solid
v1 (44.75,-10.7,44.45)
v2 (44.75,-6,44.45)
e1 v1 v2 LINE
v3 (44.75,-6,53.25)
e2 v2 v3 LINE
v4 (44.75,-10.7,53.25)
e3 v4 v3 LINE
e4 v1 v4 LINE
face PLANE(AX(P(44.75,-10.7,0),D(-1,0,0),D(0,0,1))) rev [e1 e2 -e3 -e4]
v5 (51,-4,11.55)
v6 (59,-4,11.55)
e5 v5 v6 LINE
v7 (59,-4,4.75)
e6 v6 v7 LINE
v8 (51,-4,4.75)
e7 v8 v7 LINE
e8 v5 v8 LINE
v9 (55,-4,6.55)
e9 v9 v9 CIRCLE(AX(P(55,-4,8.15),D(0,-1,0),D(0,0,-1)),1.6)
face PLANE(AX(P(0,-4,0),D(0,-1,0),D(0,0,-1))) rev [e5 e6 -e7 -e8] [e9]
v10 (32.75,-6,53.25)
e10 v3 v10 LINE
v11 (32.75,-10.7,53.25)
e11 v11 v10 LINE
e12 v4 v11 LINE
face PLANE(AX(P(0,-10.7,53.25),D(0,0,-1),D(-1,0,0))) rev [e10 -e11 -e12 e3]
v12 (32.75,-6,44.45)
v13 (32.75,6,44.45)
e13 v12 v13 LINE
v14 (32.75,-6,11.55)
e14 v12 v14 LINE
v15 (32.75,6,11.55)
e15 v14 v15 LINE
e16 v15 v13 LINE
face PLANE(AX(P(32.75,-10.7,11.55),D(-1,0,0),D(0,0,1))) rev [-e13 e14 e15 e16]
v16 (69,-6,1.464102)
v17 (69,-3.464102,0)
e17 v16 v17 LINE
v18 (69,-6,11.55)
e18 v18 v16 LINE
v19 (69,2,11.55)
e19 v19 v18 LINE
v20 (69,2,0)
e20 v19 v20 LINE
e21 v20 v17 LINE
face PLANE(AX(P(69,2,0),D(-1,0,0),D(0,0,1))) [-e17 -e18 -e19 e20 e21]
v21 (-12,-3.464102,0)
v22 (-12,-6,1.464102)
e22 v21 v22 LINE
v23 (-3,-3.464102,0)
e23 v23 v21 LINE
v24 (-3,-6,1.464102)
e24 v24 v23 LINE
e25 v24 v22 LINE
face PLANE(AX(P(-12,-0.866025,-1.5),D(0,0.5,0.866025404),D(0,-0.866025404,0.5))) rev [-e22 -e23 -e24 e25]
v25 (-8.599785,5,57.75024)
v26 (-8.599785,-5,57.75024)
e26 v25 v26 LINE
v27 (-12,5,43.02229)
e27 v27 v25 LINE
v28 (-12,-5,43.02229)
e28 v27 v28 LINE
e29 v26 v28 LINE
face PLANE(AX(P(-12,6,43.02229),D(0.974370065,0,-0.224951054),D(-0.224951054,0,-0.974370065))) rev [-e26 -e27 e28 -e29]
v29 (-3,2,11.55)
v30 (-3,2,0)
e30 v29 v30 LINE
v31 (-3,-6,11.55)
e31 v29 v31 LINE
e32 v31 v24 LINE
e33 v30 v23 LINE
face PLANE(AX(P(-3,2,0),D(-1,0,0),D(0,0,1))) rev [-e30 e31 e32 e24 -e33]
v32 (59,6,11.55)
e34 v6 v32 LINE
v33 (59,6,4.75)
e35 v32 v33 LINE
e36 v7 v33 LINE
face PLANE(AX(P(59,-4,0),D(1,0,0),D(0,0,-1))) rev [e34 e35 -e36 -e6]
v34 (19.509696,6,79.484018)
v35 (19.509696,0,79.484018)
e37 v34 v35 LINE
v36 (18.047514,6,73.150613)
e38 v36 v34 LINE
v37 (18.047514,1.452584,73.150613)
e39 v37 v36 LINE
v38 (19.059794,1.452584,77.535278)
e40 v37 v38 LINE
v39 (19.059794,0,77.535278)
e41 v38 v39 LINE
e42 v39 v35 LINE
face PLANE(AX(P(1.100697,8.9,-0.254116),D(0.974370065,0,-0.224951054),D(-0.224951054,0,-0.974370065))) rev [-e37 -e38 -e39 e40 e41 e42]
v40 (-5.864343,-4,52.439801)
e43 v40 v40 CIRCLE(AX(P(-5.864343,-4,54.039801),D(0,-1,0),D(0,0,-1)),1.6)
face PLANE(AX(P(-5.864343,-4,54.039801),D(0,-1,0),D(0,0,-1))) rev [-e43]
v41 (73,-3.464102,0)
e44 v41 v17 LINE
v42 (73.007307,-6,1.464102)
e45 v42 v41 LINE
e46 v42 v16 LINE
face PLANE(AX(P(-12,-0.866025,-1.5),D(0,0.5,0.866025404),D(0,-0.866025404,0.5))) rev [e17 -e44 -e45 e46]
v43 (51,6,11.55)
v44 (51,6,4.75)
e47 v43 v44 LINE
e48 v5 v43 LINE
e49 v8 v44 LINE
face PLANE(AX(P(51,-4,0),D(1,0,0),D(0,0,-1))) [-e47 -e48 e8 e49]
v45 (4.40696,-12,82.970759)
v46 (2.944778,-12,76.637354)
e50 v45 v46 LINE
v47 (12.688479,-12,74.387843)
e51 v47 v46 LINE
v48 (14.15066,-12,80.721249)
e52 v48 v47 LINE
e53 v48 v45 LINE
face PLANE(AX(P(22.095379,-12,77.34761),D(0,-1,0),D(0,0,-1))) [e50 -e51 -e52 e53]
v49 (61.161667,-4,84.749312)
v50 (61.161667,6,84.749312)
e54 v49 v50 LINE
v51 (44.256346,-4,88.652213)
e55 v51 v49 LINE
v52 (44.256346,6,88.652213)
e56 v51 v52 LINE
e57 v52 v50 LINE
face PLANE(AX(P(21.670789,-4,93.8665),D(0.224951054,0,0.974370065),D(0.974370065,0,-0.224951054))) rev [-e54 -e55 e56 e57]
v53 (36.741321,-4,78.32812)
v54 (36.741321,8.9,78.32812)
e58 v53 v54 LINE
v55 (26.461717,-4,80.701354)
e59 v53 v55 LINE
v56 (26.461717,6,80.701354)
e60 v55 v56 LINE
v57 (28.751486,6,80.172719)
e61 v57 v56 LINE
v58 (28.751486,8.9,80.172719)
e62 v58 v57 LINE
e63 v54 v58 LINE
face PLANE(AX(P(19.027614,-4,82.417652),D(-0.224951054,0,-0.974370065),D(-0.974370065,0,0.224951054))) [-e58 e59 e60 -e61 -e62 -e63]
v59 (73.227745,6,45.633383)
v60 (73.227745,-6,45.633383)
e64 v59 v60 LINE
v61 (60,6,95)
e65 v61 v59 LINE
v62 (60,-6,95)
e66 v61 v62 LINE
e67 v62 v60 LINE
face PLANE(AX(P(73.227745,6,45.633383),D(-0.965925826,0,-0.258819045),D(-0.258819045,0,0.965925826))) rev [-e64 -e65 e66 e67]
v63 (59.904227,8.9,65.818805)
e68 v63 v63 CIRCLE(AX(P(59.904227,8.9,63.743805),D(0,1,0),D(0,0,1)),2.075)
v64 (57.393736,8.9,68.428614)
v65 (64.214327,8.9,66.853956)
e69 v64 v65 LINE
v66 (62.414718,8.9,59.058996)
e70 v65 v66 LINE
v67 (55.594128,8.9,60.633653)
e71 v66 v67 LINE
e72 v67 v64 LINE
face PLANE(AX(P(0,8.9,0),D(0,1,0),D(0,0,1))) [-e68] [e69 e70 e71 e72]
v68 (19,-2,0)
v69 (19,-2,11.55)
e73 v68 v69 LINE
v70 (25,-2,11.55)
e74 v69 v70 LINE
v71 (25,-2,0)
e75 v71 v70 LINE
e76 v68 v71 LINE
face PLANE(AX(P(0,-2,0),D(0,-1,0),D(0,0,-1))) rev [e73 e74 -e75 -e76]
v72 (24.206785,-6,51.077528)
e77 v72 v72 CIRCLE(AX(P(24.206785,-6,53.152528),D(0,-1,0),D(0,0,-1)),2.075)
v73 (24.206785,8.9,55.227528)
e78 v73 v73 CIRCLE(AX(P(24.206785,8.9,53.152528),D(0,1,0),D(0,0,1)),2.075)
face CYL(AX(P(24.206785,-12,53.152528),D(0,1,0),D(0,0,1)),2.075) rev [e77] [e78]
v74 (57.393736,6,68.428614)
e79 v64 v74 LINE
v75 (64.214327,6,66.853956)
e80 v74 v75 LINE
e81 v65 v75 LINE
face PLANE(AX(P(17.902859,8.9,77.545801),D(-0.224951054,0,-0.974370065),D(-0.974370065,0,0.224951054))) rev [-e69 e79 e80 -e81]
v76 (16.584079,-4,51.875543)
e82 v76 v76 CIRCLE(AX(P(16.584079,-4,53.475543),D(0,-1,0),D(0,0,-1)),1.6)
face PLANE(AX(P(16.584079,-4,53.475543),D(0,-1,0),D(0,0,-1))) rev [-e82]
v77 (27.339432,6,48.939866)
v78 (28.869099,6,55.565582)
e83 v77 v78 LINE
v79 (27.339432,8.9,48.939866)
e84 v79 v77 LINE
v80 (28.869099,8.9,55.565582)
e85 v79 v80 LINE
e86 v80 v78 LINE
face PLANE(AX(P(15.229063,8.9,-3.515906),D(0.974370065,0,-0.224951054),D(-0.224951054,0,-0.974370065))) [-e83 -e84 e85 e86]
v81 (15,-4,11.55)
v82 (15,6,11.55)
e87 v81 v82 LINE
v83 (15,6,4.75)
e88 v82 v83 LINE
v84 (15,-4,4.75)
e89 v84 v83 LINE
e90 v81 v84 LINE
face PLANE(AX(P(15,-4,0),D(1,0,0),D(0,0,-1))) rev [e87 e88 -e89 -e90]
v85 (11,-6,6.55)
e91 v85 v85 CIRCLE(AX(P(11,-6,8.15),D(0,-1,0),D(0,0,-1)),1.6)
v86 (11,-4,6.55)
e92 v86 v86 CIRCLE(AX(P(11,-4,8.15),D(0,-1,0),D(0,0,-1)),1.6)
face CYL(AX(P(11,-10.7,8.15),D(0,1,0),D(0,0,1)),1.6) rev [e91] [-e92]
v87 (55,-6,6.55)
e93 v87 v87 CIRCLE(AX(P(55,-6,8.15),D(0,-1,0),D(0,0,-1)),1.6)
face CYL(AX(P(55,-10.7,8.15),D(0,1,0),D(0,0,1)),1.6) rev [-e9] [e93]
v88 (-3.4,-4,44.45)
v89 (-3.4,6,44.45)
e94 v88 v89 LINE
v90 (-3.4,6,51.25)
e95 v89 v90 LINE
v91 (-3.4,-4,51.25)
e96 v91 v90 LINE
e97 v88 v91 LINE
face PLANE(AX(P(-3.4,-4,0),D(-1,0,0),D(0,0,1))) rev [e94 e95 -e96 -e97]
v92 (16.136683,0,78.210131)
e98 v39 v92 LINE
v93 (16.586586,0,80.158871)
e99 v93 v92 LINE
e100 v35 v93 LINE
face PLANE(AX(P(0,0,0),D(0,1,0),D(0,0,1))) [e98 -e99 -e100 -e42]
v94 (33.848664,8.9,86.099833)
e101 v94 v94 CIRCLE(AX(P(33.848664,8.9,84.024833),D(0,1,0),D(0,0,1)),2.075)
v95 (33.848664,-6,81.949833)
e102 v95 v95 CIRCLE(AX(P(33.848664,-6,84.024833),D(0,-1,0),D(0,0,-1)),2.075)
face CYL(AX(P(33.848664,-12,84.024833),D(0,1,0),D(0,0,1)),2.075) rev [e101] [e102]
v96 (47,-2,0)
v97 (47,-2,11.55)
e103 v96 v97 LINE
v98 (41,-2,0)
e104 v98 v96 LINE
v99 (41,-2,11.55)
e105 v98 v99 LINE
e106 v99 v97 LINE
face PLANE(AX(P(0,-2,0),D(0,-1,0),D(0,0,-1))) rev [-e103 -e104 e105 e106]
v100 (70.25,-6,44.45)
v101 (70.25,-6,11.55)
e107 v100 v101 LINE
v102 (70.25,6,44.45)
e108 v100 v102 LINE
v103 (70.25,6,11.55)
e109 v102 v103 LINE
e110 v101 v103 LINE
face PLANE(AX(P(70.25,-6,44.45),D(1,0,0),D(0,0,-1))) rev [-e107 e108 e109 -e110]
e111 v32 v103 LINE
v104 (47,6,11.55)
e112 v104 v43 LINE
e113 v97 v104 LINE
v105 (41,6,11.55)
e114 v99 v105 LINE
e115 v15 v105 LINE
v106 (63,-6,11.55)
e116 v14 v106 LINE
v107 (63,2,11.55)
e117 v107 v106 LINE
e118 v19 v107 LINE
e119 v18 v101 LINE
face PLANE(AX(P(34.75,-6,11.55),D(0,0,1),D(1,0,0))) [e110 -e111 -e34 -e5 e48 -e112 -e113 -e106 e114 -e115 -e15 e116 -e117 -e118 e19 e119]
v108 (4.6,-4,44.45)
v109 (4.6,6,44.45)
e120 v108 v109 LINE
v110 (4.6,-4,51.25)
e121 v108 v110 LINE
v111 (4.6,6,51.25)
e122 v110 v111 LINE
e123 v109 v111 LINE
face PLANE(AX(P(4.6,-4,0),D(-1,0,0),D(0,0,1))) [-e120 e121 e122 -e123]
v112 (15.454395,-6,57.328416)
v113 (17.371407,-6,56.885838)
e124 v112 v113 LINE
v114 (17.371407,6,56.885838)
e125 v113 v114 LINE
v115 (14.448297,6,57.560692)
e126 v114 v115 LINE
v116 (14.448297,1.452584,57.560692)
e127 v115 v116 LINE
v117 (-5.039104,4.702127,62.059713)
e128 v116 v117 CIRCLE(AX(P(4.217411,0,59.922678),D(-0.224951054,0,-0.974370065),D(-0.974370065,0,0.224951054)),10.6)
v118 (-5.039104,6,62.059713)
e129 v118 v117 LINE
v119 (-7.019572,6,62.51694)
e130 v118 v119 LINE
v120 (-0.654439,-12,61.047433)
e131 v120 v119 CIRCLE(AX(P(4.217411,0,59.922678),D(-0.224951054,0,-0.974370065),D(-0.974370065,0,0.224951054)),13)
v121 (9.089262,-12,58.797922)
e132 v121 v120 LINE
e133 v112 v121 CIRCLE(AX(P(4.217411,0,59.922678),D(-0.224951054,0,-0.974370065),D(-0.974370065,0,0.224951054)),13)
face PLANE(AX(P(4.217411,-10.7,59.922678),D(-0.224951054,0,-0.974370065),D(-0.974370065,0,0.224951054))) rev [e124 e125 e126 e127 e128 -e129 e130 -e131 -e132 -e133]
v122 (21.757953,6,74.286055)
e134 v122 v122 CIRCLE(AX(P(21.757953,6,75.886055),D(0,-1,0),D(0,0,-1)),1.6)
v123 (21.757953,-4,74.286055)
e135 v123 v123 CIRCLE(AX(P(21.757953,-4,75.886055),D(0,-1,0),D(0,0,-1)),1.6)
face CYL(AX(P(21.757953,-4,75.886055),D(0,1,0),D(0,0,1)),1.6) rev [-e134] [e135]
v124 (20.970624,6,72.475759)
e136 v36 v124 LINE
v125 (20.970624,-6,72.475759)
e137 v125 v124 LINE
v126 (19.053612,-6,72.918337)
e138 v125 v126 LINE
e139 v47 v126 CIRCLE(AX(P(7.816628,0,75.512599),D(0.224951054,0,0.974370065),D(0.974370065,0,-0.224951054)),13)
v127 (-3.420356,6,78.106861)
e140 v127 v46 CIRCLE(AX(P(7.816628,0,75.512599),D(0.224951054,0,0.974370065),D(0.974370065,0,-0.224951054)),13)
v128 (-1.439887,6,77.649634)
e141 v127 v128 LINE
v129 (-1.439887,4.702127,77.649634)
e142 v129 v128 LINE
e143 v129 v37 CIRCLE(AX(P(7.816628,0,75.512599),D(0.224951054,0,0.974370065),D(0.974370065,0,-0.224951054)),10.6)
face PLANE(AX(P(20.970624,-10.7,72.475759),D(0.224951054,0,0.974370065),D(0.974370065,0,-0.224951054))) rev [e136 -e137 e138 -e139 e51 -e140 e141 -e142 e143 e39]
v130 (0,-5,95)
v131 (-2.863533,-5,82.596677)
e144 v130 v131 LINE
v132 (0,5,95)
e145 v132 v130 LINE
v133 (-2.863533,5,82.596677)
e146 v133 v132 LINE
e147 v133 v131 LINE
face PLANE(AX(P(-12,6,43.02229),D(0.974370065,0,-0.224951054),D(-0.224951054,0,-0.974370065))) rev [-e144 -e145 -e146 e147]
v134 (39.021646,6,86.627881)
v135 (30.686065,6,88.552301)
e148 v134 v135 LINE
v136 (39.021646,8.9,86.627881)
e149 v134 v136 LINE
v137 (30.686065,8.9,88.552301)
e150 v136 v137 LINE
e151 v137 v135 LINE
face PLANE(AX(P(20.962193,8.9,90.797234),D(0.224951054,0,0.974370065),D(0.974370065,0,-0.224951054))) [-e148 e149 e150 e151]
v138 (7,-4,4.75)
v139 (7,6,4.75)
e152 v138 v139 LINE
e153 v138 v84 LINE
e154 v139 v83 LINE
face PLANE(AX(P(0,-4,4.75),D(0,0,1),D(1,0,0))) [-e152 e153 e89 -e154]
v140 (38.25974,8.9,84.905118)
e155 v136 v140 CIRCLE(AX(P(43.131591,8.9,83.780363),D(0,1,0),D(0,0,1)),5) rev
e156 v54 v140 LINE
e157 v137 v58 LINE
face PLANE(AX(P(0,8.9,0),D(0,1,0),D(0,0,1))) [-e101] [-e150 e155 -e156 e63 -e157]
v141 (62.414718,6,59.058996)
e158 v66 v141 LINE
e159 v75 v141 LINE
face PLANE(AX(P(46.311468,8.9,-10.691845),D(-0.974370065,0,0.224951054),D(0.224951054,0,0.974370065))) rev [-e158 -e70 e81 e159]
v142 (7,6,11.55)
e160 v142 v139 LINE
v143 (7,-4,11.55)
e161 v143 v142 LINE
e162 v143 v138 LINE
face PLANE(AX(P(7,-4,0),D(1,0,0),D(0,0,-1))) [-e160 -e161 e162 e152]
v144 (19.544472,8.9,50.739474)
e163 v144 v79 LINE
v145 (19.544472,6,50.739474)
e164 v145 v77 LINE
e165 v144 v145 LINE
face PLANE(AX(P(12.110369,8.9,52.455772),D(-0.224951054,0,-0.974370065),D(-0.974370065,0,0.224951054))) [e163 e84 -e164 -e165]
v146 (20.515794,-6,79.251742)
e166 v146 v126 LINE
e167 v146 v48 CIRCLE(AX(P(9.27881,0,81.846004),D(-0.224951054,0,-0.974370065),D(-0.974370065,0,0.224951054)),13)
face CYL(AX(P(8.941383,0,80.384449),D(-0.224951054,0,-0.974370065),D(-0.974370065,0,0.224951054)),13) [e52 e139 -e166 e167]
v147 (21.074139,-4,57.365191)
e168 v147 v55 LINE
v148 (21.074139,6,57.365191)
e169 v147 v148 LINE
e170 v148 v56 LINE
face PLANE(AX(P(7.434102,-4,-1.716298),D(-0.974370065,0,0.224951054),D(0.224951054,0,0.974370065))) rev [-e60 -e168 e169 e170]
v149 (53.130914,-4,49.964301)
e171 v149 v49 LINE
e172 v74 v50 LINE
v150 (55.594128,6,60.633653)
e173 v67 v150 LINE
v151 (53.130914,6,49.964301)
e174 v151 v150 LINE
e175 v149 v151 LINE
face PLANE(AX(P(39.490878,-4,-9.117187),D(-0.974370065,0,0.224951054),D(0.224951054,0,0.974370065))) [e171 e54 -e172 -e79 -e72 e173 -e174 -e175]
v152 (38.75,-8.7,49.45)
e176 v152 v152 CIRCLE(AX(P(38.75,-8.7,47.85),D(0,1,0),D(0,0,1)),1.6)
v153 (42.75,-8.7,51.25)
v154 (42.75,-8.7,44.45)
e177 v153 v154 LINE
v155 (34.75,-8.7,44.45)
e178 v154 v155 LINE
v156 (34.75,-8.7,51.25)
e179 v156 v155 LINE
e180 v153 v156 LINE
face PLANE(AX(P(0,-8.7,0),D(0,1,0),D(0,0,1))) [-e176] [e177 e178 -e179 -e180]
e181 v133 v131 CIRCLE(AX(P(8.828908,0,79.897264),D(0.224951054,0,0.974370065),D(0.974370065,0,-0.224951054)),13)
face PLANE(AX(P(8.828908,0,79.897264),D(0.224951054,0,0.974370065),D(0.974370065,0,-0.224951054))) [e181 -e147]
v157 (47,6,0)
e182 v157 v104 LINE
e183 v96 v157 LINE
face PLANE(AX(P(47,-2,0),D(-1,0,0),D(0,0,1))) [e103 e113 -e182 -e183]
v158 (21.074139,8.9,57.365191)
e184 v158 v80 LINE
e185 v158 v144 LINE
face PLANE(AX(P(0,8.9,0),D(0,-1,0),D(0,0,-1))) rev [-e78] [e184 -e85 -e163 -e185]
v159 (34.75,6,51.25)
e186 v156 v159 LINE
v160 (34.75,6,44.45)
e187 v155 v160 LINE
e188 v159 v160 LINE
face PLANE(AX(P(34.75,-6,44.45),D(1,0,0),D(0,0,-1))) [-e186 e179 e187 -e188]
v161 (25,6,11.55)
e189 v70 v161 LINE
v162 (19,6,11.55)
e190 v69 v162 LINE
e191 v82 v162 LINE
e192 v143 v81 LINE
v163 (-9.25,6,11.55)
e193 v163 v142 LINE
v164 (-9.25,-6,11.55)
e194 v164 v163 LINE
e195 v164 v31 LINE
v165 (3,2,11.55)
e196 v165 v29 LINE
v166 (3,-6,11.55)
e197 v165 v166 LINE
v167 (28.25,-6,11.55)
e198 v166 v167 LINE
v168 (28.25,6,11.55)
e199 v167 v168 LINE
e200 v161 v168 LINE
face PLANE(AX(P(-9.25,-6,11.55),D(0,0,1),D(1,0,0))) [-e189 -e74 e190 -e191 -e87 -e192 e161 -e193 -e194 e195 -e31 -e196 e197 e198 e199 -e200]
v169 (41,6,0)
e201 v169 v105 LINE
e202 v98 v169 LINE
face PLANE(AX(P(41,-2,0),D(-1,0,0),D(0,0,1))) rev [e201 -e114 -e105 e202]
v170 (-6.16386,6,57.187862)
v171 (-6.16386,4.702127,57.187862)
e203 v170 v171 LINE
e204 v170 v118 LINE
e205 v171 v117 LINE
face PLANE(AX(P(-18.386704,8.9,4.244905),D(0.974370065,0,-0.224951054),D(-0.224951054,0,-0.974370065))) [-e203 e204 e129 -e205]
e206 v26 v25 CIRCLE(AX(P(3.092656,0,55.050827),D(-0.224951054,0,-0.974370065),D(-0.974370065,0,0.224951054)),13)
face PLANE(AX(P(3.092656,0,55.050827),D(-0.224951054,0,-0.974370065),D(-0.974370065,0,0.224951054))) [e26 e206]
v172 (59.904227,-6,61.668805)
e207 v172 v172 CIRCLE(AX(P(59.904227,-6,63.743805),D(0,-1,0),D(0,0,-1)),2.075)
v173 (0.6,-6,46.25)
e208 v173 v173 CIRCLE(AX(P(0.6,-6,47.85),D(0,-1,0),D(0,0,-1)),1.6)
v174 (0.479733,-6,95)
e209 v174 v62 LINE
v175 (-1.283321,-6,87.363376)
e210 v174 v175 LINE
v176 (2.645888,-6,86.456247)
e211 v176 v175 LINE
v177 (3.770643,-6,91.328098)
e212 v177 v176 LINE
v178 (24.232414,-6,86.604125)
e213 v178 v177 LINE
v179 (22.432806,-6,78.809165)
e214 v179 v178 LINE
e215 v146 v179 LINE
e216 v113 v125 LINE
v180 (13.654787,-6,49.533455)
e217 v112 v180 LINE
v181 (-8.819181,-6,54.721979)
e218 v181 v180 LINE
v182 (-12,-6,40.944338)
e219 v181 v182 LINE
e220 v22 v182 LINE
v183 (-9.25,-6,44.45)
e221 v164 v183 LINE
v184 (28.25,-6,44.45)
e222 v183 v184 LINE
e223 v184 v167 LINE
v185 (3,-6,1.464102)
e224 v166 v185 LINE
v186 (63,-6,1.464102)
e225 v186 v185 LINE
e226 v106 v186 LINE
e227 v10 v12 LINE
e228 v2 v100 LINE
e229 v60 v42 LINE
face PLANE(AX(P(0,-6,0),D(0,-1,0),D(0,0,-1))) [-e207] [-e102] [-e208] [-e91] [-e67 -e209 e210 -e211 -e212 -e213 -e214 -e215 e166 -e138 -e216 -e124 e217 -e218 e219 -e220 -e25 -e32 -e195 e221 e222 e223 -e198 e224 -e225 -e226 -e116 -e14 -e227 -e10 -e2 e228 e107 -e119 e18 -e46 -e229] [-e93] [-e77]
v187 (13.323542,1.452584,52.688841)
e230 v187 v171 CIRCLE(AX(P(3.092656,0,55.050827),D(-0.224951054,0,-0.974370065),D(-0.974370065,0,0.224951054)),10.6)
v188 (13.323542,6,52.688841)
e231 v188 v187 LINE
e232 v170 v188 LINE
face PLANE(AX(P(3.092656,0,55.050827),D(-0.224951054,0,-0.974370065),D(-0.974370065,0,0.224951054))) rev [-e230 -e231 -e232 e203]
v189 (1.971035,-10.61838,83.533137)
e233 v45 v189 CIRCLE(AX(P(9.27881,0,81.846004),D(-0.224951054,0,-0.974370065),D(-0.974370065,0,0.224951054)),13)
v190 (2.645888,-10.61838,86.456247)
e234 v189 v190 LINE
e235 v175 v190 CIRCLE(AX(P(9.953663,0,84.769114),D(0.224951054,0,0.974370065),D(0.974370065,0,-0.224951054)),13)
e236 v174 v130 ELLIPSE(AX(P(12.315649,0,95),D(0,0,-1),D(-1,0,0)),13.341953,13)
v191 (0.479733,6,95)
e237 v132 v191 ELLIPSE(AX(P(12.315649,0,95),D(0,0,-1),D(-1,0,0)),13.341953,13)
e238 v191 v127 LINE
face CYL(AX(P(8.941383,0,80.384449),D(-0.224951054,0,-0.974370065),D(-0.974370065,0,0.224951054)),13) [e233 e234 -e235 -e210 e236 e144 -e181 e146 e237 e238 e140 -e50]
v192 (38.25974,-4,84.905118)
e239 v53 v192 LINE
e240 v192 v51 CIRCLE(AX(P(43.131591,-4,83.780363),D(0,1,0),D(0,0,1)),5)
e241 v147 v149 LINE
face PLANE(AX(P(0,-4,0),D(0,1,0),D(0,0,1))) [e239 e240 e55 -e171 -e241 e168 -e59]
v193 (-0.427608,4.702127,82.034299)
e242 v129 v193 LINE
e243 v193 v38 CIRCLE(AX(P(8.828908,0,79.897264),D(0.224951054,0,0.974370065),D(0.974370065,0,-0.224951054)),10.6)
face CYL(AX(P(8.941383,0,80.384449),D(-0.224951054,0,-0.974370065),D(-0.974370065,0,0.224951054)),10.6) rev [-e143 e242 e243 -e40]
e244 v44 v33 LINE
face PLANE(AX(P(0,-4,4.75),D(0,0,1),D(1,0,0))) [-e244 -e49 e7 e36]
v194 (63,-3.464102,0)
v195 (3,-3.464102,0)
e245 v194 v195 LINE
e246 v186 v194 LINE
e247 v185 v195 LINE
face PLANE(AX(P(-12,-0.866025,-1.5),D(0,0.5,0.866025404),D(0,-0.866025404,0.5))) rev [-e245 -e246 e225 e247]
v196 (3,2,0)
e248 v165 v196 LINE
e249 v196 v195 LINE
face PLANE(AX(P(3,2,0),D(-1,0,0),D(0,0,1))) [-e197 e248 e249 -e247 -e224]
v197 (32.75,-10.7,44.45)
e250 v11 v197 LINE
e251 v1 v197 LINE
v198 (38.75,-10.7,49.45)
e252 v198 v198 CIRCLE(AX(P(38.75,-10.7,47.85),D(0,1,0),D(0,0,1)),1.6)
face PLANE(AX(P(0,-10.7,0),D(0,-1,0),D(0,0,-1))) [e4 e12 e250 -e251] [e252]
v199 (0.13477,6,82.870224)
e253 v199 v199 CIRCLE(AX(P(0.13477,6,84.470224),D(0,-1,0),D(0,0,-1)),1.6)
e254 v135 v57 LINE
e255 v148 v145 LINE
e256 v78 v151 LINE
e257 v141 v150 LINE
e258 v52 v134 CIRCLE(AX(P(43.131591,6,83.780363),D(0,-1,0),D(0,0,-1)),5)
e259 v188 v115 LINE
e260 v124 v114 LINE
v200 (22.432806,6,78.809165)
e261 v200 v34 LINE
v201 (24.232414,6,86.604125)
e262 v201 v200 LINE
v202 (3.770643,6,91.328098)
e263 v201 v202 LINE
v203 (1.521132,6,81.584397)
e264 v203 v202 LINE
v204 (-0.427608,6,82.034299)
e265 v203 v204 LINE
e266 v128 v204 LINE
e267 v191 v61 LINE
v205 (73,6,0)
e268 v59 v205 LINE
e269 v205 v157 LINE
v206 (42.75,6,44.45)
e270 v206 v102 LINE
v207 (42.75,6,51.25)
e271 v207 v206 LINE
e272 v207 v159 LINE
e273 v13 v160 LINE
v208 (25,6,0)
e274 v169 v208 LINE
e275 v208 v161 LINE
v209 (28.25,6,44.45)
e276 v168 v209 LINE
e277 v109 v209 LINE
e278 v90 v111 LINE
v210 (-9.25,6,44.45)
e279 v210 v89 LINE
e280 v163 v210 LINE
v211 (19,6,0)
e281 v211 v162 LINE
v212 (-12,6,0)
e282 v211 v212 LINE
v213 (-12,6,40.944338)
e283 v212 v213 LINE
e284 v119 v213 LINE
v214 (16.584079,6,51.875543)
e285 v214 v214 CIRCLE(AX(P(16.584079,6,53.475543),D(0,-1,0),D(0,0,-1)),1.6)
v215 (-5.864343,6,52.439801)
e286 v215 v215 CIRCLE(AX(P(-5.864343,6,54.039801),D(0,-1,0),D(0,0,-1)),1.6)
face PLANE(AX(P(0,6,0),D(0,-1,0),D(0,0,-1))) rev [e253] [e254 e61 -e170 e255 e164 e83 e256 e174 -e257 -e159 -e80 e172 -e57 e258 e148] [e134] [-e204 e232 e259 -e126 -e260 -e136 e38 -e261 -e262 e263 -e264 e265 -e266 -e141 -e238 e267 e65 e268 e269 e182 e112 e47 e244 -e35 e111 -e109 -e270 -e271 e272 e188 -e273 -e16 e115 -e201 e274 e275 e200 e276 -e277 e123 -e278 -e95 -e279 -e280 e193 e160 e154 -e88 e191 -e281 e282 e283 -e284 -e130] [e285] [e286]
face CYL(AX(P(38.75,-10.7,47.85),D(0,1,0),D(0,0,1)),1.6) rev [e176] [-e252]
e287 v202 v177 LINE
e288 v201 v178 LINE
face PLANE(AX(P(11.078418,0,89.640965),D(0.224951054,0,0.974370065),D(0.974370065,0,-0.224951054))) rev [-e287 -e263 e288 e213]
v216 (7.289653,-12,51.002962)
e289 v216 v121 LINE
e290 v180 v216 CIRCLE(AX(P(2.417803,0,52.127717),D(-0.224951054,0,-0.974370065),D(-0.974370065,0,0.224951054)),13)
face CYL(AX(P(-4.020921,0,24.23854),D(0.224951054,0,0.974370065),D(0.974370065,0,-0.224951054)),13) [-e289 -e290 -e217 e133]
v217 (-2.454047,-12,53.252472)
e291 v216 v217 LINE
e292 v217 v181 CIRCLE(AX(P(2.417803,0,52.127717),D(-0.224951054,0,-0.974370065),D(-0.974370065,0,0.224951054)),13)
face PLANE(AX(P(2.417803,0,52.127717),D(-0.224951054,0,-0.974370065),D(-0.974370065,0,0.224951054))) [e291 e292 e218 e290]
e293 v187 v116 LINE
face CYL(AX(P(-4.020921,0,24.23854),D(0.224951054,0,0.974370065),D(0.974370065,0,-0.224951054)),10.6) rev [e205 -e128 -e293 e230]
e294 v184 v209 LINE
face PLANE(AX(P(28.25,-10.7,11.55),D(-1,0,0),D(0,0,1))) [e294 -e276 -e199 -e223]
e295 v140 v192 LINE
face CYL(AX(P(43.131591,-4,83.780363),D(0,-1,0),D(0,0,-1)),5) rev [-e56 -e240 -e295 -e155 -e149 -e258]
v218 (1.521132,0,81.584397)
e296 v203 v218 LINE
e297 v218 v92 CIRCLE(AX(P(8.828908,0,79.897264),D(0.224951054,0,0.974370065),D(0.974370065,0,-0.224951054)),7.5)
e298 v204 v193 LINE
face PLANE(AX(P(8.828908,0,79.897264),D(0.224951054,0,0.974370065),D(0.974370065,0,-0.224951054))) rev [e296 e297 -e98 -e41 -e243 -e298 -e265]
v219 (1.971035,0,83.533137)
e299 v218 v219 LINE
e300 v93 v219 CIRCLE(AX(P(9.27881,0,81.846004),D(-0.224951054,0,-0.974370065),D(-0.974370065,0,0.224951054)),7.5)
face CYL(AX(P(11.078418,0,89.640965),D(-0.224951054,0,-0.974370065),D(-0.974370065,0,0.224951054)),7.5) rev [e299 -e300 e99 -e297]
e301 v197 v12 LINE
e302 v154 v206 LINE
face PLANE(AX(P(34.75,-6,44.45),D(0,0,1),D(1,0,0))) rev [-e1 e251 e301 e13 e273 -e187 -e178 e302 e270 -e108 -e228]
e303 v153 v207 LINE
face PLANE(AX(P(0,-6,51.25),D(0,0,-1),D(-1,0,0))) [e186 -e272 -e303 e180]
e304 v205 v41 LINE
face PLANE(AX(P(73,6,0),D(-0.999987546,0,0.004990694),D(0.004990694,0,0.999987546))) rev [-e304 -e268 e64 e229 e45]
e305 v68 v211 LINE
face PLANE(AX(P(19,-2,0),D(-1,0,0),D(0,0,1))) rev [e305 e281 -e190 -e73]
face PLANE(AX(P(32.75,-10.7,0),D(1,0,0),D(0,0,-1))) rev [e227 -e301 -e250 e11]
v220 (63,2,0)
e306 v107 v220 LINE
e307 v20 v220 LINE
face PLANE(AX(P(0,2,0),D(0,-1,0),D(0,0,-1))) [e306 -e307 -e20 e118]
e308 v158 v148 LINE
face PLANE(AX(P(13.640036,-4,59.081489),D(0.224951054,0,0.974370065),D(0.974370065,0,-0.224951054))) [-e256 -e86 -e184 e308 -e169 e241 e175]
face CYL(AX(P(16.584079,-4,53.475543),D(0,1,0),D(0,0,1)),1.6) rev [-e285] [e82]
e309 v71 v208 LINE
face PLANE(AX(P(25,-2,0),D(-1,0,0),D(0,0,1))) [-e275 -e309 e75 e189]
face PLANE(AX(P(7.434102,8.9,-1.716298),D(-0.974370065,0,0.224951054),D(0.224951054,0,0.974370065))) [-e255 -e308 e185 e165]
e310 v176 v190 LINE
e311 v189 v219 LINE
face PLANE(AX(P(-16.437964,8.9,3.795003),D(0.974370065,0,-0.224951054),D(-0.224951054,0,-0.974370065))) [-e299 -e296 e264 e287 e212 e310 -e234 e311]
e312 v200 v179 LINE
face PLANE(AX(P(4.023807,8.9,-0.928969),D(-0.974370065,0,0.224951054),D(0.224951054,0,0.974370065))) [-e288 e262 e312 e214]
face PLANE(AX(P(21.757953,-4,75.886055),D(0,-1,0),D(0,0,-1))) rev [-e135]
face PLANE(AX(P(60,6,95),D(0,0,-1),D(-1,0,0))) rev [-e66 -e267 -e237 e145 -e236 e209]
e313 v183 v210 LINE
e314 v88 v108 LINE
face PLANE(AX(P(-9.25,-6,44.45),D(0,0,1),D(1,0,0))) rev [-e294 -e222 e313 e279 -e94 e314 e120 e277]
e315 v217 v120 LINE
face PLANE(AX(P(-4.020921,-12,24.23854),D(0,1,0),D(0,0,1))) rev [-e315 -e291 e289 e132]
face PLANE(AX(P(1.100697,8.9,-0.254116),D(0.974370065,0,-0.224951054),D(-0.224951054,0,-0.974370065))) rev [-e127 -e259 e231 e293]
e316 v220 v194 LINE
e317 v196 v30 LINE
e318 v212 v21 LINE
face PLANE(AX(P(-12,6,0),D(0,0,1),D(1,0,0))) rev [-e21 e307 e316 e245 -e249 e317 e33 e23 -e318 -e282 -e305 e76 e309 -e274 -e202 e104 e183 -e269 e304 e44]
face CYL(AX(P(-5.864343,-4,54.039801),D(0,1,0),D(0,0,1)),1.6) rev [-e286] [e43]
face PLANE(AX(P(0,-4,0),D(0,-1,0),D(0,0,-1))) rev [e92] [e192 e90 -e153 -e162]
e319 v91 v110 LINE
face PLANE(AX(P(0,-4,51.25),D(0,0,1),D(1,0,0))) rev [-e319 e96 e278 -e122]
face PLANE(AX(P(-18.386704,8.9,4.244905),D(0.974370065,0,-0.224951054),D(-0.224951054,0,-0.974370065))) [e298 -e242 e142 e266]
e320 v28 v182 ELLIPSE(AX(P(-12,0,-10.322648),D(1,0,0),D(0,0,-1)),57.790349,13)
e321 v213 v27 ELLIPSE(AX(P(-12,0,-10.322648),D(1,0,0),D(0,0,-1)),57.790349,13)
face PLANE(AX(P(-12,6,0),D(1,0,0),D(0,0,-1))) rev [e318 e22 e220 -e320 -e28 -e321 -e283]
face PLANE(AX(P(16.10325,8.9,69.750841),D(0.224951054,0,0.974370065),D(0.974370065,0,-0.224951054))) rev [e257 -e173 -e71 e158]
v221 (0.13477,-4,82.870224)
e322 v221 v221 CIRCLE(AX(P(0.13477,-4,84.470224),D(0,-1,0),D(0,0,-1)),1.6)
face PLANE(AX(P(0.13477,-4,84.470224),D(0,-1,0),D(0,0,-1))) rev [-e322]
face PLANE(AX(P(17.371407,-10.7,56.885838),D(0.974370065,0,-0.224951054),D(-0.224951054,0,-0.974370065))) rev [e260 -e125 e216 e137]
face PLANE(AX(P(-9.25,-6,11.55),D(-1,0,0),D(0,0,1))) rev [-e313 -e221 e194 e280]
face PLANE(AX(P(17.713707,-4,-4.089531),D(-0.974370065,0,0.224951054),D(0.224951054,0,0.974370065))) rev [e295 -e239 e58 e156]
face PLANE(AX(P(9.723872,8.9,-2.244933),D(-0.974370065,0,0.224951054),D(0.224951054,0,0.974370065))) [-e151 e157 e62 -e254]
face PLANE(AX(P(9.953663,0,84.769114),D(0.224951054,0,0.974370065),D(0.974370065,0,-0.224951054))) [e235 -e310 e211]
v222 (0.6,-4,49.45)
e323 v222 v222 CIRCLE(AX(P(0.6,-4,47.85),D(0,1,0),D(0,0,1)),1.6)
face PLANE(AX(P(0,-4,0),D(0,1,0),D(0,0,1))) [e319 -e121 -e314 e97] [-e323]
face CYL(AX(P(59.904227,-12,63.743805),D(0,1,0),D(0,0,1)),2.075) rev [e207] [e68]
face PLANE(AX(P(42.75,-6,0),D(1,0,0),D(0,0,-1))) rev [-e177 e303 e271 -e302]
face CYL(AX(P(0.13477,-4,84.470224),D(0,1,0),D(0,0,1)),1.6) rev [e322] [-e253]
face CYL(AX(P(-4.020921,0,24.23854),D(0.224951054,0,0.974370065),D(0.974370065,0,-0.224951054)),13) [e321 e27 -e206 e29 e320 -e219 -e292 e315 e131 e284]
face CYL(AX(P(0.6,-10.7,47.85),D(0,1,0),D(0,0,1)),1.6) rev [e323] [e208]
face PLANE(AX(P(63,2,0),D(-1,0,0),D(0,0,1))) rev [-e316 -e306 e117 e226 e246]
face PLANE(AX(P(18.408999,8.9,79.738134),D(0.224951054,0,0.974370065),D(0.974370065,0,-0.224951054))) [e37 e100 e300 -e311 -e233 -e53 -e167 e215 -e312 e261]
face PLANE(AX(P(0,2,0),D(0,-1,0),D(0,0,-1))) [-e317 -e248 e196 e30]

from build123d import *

# Parameters (mm, degrees)
BOSS_EXTRUDE2_DEPTH      = 6
BOSS_EXTRUDE2_DEPTH_BACK = 6
CUT_EXTRUDE1_DEPTH       = 121.097055122
CUT_EXTRUDE1_DEPTH_BACK  = 121.097055122
SKETCH2_W                = 35.5
SKETCH2_H                = 32.9
CUT_EXTRUDE2_START       = 6
SKETCH2_9_W              = 8
SKETCH2_9_H              = 6.8
SKETCH2_9_R              = 1.6
CUT_EXTRUDE2_DEPTH       = 10
CUT_EXTRUDE15_DEPTH      = 121.097055122
CUT_EXTRUDE15_DEPTH_BACK = 117.097055122
CUT_EXTRUDE15_START      = -4
SKETCH2_11_W             = 8
SKETCH2_11_H             = 6.8
SKETCH2_11_R             = 1.6
EXTRUDE_THIN1_START      = -6
EXTRUDE_THIN1_DEPTH      = 4.7
BOSS_EXTRUDE7_START      = -10.7
SKETCH2_15_W             = 8
SKETCH2_15_H             = 6.8
BOSS_EXTRUDE7_DEPTH      = 2
CUT_EXTRUDE3_DEPTH       = 121.423389128
CUT_EXTRUDE3_DEPTH_BACK  = 121.423389128
SKETCH2_10_R             = 1.6
CUT_EXTRUDE4_DEPTH       = 121.423389128
CUT_EXTRUDE4_DEPTH_BACK  = 121.423389128
SKETCH4_W                = 37.5
SKETCH4_H                = 32.9
CUT_EXTRUDE5_START       = -6
SKETCH5_W                = 6
SKETCH5_H                = 11.55
CUT_EXTRUDE5_DEPTH       = 8
CUT_EXTRUDE6_START       = 6
SKETCH5_4_W              = 6
SKETCH5_4_H              = 11.55
CUT_EXTRUDE6_DEPTH       = 8
CUT_EXTRUDE7_DEPTH       = 121.423389128
CUT_EXTRUDE7_DEPTH_BACK  = 121.423389128
BOSS_EXTRUDE3_START      = 8
BOSS_EXTRUDE3_DEPTH      = 5
BOSS_EXTRUDE4_START      = -13
BOSS_EXTRUDE4_DEPTH      = 5
CUT_EXTRUDE9_START       = 8
SKETCH12_4_R             = 13
CUT_EXTRUDE9_DEPTH       = 5
CUT_EXTRUDE10_START      = -12.5
SKETCH12_5_R             = 13
CUT_EXTRUDE10_DEPTH      = 4.5
BOSS_EXTRUDE5_START      = 8
BOSS_EXTRUDE5_DEPTH      = 5
BOSS_EXTRUDE6_START      = -12.5
BOSS_EXTRUDE6_DEPTH      = 4.5
BOSS_EXTRUDE9_START      = 13
BOSS_EXTRUDE9_DEPTH      = 3
BOSS_EXTRUDE10_START     = -17.5
BOSS_EXTRUDE10_DEPTH     = 5
CUT_EXTRUDE20_DEPTH      = 89.442017134
CUT_EXTRUDE20_DEPTH_BACK = 89.442017134
CUT_EXTRUDE11_START      = -4
CUT_EXTRUDE11_DEPTH      = 10
BOSS_EXTRUDE8_START      = 6
SKETCH14_5_W             = 6.8
SKETCH14_5_H             = 8
SKETCH14_5_W_2           = 8.6
SKETCH14_5_H_2           = 8.2
SKETCH14_5_W_3           = 8
SKETCH14_5_H_3           = 7
BOSS_EXTRUDE8_DEPTH      = 2.9
CUT_EXTRUDE13_DEPTH      = 121.54585289
CUT_EXTRUDE13_DEPTH_BACK = 121.54585289
SKETCH14_4_R             = 2.075
FILLET1_R                = 5
CUT_EXTRUDE16_START      = -22.5
SKETCH17_R               = 7.5
SKETCH17_R_2             = 5.5
CUT_EXTRUDE16_DEPTH      = 10
CUT_EXTRUDE17_DEPTH      = 6
CUT_EXTRUDE18_DEPTH      = 121.54585289
CUT_EXTRUDE19_START      = 1.452584
SKETCH18_4_W             = 25.5
SKETCH18_4_H             = 20
CUT_EXTRUDE19_DEPTH      = 4.547416
CUT_EXTRUDE21_START      = 6
SKETCH21_R               = 1.6
CUT_EXTRUDE21_DEPTH      = 10
CUT_EXTRUDE22_DEPTH      = 121.54585289
CUT_EXTRUDE22_DEPTH_BACK = 121.54585289


# Read off the part's stored shape, not the designer's step: Boss-Extrude3, Boss-Extrude4, Boss-Extrude10, Cut-Extrude17
with BuildPart() as part:
    # Sketch1 → Boss-Extrude2 (new, two sides: drawn at the far end of the back side and taken through both)
    with BuildSketch(Plane(origin=(0, 0, 0), x_dir=(1, 0, 0), z_dir=(0, 1, 0)).offset(-BOSS_EXTRUDE2_DEPTH_BACK)):
        Polygon((-12, 0), (73, 0), (73.227745076, -45.633383306), (60, -95), (0, -95), (-12, -43.022289509), align=None)
    extrude(amount=BOSS_EXTRUDE2_DEPTH + BOSS_EXTRUDE2_DEPTH_BACK)

    # Sketch2 → Cut-Extrude1 (cut, two sides: drawn at the far end of the back side and taken through both)
    with BuildSketch(Plane(origin=(0, 0, 0), x_dir=(1, 0, 0), z_dir=(0, 1, 0)).offset(-CUT_EXTRUDE1_DEPTH_BACK)):
        with Locations((8.5, -28)):
            Rectangle(SKETCH2_W, SKETCH2_H)
        with Locations((52.5, -28)):
            Rectangle(SKETCH2_W, SKETCH2_H)
    extrude(amount=CUT_EXTRUDE1_DEPTH + CUT_EXTRUDE1_DEPTH_BACK, mode=Mode.SUBTRACT)

    # Sketch2<9> → Cut-Extrude2 (cut)
    with BuildSketch(Plane(origin=(0, 0, 0), x_dir=(1, 0, 0), z_dir=(0, 1, 0)).offset(CUT_EXTRUDE2_START)):
        with Locations((11, -8.15)):
            Rectangle(SKETCH2_9_W, SKETCH2_9_H)
        with Locations((0.6, -47.85)):
            Rectangle(SKETCH2_9_W, SKETCH2_9_H)
        with Locations((55, -8.15)):
            Rectangle(SKETCH2_9_W, SKETCH2_9_H)
        with Locations(Location((38.75, -47.85, 0), (0, 0, 90))):
            Circle(SKETCH2_9_R)
    extrude(amount=-CUT_EXTRUDE2_DEPTH, mode=Mode.SUBTRACT)

    # Sketch2<11> → Cut-Extrude15 (cut, two sides: drawn at the far end of the back side and taken through both)
    # profile 1 of 2: a face of its own
    with BuildSketch(Plane(origin=(0, 0, 0), x_dir=(1, 0, 0), z_dir=(0, 1, 0)).offset(CUT_EXTRUDE15_START - CUT_EXTRUDE15_DEPTH_BACK)):
        with Locations((38.75, -47.85)):
            Rectangle(SKETCH2_11_W, SKETCH2_11_H)
        with Locations((38.75, -47.85)):
            Circle(SKETCH2_11_R, mode=Mode.SUBTRACT)
    # profile 2 of 2: a face of its own
    with BuildSketch(Plane(origin=(0, 0, 0), x_dir=(1, 0, 0), z_dir=(0, 1, 0)).offset(CUT_EXTRUDE15_START - CUT_EXTRUDE15_DEPTH_BACK)):
        with Locations((38.75, -47.85)):
            Circle(SKETCH2_11_R)
    extrude(amount=CUT_EXTRUDE15_DEPTH + CUT_EXTRUDE15_DEPTH_BACK, mode=Mode.SUBTRACT)

    # Sketch16 → Extrude-Thin1 (add)
    with BuildSketch(Plane(origin=(0, 0, 0), x_dir=(1, 0, 0), z_dir=(0, 1, 0)).offset(EXTRUDE_THIN1_START)):
        Polygon((34.75, -44.45), (34.75, -51.25), (42.75, -51.25), (42.75, -44.45), (44.75, -44.45), (44.75, -53.25), (32.75, -53.25), (32.75, -44.45), align=None)
    extrude(amount=-EXTRUDE_THIN1_DEPTH)

    # Sketch2<15> → Boss-Extrude7 (add)
    with BuildSketch(Plane(origin=(0, 0, 0), x_dir=(1, 0, 0), z_dir=(0, 1, 0)).offset(BOSS_EXTRUDE7_START)):
        with Locations((38.75, -47.85)):
            Rectangle(SKETCH2_15_W, SKETCH2_15_H)
    extrude(amount=BOSS_EXTRUDE7_DEPTH)

    # Sketch2<10> → Cut-Extrude3 (cut, two sides: drawn at the far end of the back side and taken through both)
    with BuildSketch(Plane(origin=(0, 0, 0), x_dir=(1, 0, 0), z_dir=(0, 1, 0)).offset(-CUT_EXTRUDE3_DEPTH_BACK)):
        with Locations(Location((0.6, -47.85, 0), (0, 0, 270))):
            Circle(SKETCH2_10_R)
        with Locations(Location((38.75, -47.85, 0), (0, 0, 270))):
            Circle(SKETCH2_10_R)
        with Locations(Location((55, -8.15, 0), (0, 0, 90))):
            Circle(SKETCH2_10_R)
        with Locations(Location((11, -8.15, 0), (0, 0, 90))):
            Circle(SKETCH2_10_R)
    extrude(amount=CUT_EXTRUDE3_DEPTH + CUT_EXTRUDE3_DEPTH_BACK, mode=Mode.SUBTRACT)

    # Sketch4 → Cut-Extrude4 (cut, two sides: drawn at the far end of the back side and taken through both)
    with BuildSketch(Plane(origin=(0, 0, 0), x_dir=(1, 0, 0), z_dir=(0, 1, 0)).offset(-CUT_EXTRUDE4_DEPTH_BACK)):
        with Locations((9.5, -28)):
            Rectangle(SKETCH4_W, SKETCH4_H)
        with Locations((51.5, -28)):
            Rectangle(SKETCH4_W, SKETCH4_H)
    extrude(amount=CUT_EXTRUDE4_DEPTH + CUT_EXTRUDE4_DEPTH_BACK, mode=Mode.SUBTRACT)

    # Sketch5 → Cut-Extrude5 (cut)
    with BuildSketch(Plane(origin=(0, 0, 0), x_dir=(1, 0, 0), z_dir=(0, 1, 0)).offset(CUT_EXTRUDE5_START)):
        with Locations((0, -5.775)):
            Rectangle(SKETCH5_W, SKETCH5_H)
        with Locations((66, -5.775)):
            Rectangle(SKETCH5_W, SKETCH5_H)
    extrude(amount=CUT_EXTRUDE5_DEPTH, mode=Mode.SUBTRACT)

    # Sketch5<4> → Cut-Extrude6 (cut)
    with BuildSketch(Plane(origin=(0, 0, 0), x_dir=(1, 0, 0), z_dir=(0, 1, 0)).offset(CUT_EXTRUDE6_START)):
        with Locations((22, -5.775)):
            Rectangle(SKETCH5_4_W, SKETCH5_4_H)
        with Locations((44, -5.775)):
            Rectangle(SKETCH5_4_W, SKETCH5_4_H)
    extrude(amount=-CUT_EXTRUDE6_DEPTH, mode=Mode.SUBTRACT)

    # Sketch11 → Cut-Extrude7 (cut, two sides: drawn at the far end of the back side and taken through both)
    with BuildSketch(Plane(origin=(0, 0, 0), x_dir=(0.2249510543438689, 0, 0.9743700647852344), z_dir=(0, 1, 0)).offset(-CUT_EXTRUDE7_DEPTH_BACK)):
        Polygon((59.335574448, -9.370350163), (59.335574448, 4.129649837), (75.335574448, 4.129649837), (75.335574448, -9.370350163), (75.335574448, -28.058089367), (59.335574448, -28.058089367), align=None)
    extrude(amount=CUT_EXTRUDE7_DEPTH + CUT_EXTRUDE7_DEPTH_BACK, mode=Mode.SUBTRACT)

    # Boss-Extrude3 outline → Boss-Extrude3 (add)
    with BuildSketch(Plane(origin=(15.147208467, 0, 65.609768037), x_dir=(0.9743700647852345, 0, -0.2249510543438689), z_dir=(-0.2249510543438689, 0, -0.9743700647852345)).offset(BOSS_EXTRUDE3_START)):
        with BuildLine():
            Line((-20.902912757, 6), (-18.108771073, 6))
            ThreePointArc((-18.108771073, 6), (-9.370350163, 10.6), (-0.631929253, 6))
            Line((-0.631929253, 6), (2.162212432, 6))
            ThreePointArc((2.162212432, 6), (-0.576522413, 9.574371703), (-4.370350163, 12))
            Line((-4.370350163, 12), (-14.370350163, 12))
            ThreePointArc((-14.370350163, 12), (-18.164177912, 9.574371703), (-20.902912757, 6))
        make_face()
    extrude(amount=BOSS_EXTRUDE3_DEPTH)

    # Boss-Extrude4 outline → Boss-Extrude4 (add)
    with BuildSketch(Plane(origin=(15.147208467, 0, 65.609768037), x_dir=(0.9743700647852345, 0, -0.2249510543438689), z_dir=(-0.2249510543438689, 0, -0.9743700647852345)).offset(BOSS_EXTRUDE4_START)):
        with BuildLine():
            ThreePointArc((-18.108771073, 6), (-9.370350163, 10.6), (-0.631929253, 6))
            Line((-0.631929253, 6), (2.162212432, 6))
            ThreePointArc((2.162212432, 6), (-0.576522413, 9.574371703), (-4.370350163, 12))
            Line((-4.370350163, 12), (-14.370350163, 12))
            ThreePointArc((-14.370350163, 12), (-18.164177912, 9.574371703), (-20.902912757, 6))
            Line((-20.902912757, 6), (-18.108771073, 6))
        make_face()
    extrude(amount=BOSS_EXTRUDE4_DEPTH)

    # Sketch12<4> → Cut-Extrude9 (cut)
    with BuildSketch(Plane(origin=(15.147208467, 0, 65.609768037), x_dir=(0.9743700647852345, 0, -0.2249510543438689), z_dir=(-0.2249510543438689, 0, -0.9743700647852345)).offset(CUT_EXTRUDE9_START)):
        with Locations((-9.370350163, 0)):
            Circle(SKETCH12_4_R)
    extrude(amount=CUT_EXTRUDE9_DEPTH, mode=Mode.SUBTRACT)

    # Sketch12<5> → Cut-Extrude10 (cut)
    with BuildSketch(Plane(origin=(15.147208467, 0, 65.609768037), x_dir=(0.9743700647852345, 0, -0.2249510543438689), z_dir=(-0.2249510543438689, 0, -0.9743700647852345)).offset(CUT_EXTRUDE10_START)):
        with Locations((-9.370350163, 0)):
            Circle(SKETCH12_5_R)
    extrude(amount=CUT_EXTRUDE10_DEPTH, mode=Mode.SUBTRACT)

    # Sketch12<7> → Boss-Extrude5 (add)
    with BuildSketch(Plane(origin=(15.147208467, 0, 65.609768037), x_dir=(0.9743700647852345, 0, -0.2249510543438689), z_dir=(-0.2249510543438689, 0, -0.9743700647852345)).offset(BOSS_EXTRUDE5_START)):
        with BuildLine():
            Line((-21.370350163, 5), (-21.370350163, 3.163053095))
            Line((-21.370350163, 3.163053095), (-21.370350163, -4.002520569))
            Line((-21.370350163, -4.002520569), (-21.370350163, -5))
            ThreePointArc((-21.370350163, -5), (-21.147250246, -5.504963618), (-20.902912757, -6))
            Line((-20.902912757, -6), (-18.108771073, -6))
            ThreePointArc((-18.108771073, -6), (-19.970350163, 0), (-18.108771073, 6))
            ThreePointArc((-18.108771073, 6), (-9.370350163, 10.6), (-0.631929253, 6))
            ThreePointArc((-0.631929253, 6), (0.753563647, 3.141077709), (1.229649837, 0))
            ThreePointArc((1.229649837, 0), (0.753563647, -3.141077709), (-0.631929253, -6))
            Line((-0.631929253, -6), (2.162212432, -6))
            ThreePointArc((2.162212432, -6), (3.257462667, -3.088420816), (3.629649837, 0))
            ThreePointArc((3.629649837, 0), (1.446303664, 7.211102551), (-4.370350163, 12))
            Line((-4.370350163, 12), (-14.370350163, 12))
            ThreePointArc((-14.370350163, 12), (-18.562738318, 9.192388155), (-21.370350163, 5))
        make_face()
        with BuildLine():
            Line((-21.370350163, -4.002520569), (-21.370350163, 3.163053095))
            Line((-21.370350163, 3.163053095), (-21.370350163, 5))
            ThreePointArc((-21.370350163, 5), (-22.370350163, 0), (-21.370350163, -5))
            Line((-21.370350163, -5), (-21.370350163, -4.002520569))
        make_face()
    extrude(amount=BOSS_EXTRUDE5_DEPTH)

    # Sketch12<9> → Boss-Extrude6 (add)
    with BuildSketch(Plane(origin=(15.147208467, 0, 65.609768037), x_dir=(0.9743700647852345, 0, -0.2249510543438689), z_dir=(-0.2249510543438689, 0, -0.9743700647852345)).offset(BOSS_EXTRUDE6_START)):
        with BuildLine():
            ThreePointArc((-14.370350163, 12), (-21.590473177, 4.434928806), (-20.902912757, -6))
            Line((-20.902912757, -6), (-18.108771073, -6))
            ThreePointArc((-18.108771073, -6), (-9.370350163, 10.6), (-0.631929253, -6))
            Line((-0.631929253, -6), (2.162212432, -6))
            ThreePointArc((2.162212432, -6), (2.849772852, 4.434928806), (-4.370350163, 12))
            Line((-4.370350163, 12), (-14.370350163, 12))
        make_face()
    extrude(amount=BOSS_EXTRUDE6_DEPTH)

    # Sketch12<10> → Boss-Extrude9 (add)
    with BuildSketch(Plane(origin=(15.147208467, 0, 65.609768037), x_dir=(0.9743700647852345, 0, -0.2249510543438689), z_dir=(-0.2249510543438689, 0, -0.9743700647852345)).offset(BOSS_EXTRUDE9_START)):
        with BuildLine():
            Line((-21.370350163, 5), (-21.370350163, 3.163053095))
            Line((-21.370350163, 3.163053095), (-21.370350163, -4.002520569))
            Line((-21.370350163, -4.002520569), (-21.370350163, -5))
            ThreePointArc((-21.370350163, -5), (-21.147250246, -5.504963618), (-20.902912757, -6))
            Line((-20.902912757, -6), (-18.108771073, -6))
            ThreePointArc((-18.108771073, -6), (-19.970350163, 0), (-18.108771073, 6))
            ThreePointArc((-18.108771073, 6), (-9.370350163, 10.6), (-0.631929253, 6))
            ThreePointArc((-0.631929253, 6), (0.753563647, 3.141077709), (1.229649837, 0))
            ThreePointArc((1.229649837, 0), (0.753563647, -3.141077709), (-0.631929253, -6))
            Line((-0.631929253, -6), (2.162212432, -6))
            ThreePointArc((2.162212432, -6), (3.257462667, -3.088420816), (3.629649837, 0))
            ThreePointArc((3.629649837, 0), (1.446303664, 7.211102551), (-4.370350163, 12))
            Line((-4.370350163, 12), (-14.370350163, 12))
            ThreePointArc((-14.370350163, 12), (-18.562738318, 9.192388155), (-21.370350163, 5))
        make_face()
        with BuildLine():
            ThreePointArc((-0.631929253, 6), (-9.370350163, 10.6), (-18.108771073, 6))
            Line((-18.108771073, 6), (-0.631929253, 6))
        make_face()
    extrude(amount=BOSS_EXTRUDE9_DEPTH)

    # Boss-Extrude10 outline → Boss-Extrude10 (add)
    with BuildSketch(Plane(origin=(15.147208467, 0, 65.609768037), x_dir=(0.9743700647852345, 0, -0.2249510543438689), z_dir=(-0.2249510543438689, 0, -0.9743700647852345)).offset(BOSS_EXTRUDE10_START)):
        with BuildLine():
            Line((-4.370350163, 12), (-14.370350163, 12))
            ThreePointArc((-14.370350163, 12), (-18.164177912, 9.574371703), (-20.902912757, 6))
            Line((-20.902912757, 6), (2.162212432, 6))
            ThreePointArc((2.162212432, 6), (-0.576522413, 9.574371703), (-4.370350163, 12))
        make_face()
    extrude(amount=BOSS_EXTRUDE10_DEPTH)

    # Sketch20 → Cut-Extrude20 (cut, two sides: drawn at the far end of the back side and taken through both)
    with BuildSketch(Plane(origin=(15.147208467, 0, 65.609768037), x_dir=(0.9743700647852345, 0, -0.2249510543438689), z_dir=(-0.2249510543438689, 0, -0.9743700647852345)).offset(-CUT_EXTRUDE20_DEPTH_BACK)):
        with BuildLine():
            ThreePointArc((-20.902912757, -6), (-22.370350163, 0), (-20.902912757, 6))
            Line((-20.902912757, 6), (-20.902912757, 13.688121188))
            Line((-20.902912757, 13.688121188), (-35.899233089, 13.688121188))
            Line((-35.899233089, 13.688121188), (-35.899233089, -13.876807322))
            Line((-35.899233089, -13.876807322), (-20.902912757, -13.876807322))
            Line((-20.902912757, -13.876807322), (-20.902912757, -6))
        make_face()
    extrude(amount=CUT_EXTRUDE20_DEPTH + CUT_EXTRUDE20_DEPTH_BACK, mode=Mode.SUBTRACT)

    # Sketch14 → Cut-Extrude11 (cut)
    with BuildSketch(Plane(origin=(0, 0, 0), x_dir=(0.2249510543438689, 0, 0.9743700647852344), z_dir=(0, 1, 0)).offset(CUT_EXTRUDE11_START)):
        Polygon((60.635574448, 7.629649837), (84.585574448, 7.629649837), (84.585574448, 18.179649837), (96.335574448, 18.179649837), (96.335574448, 40.529649837), (60.635574448, 40.529649837), align=None)
    extrude(amount=CUT_EXTRUDE11_DEPTH, mode=Mode.SUBTRACT)

    # Sketch14<5> → Boss-Extrude8 (add)
    with BuildSketch(Plane(origin=(0, 0, 0), x_dir=(0.2249510543438689, 0, 0.9743700647852344), z_dir=(0, 1, 0)).offset(BOSS_EXTRUDE8_START)):
        with Locations((57.235574448, 11.629649837)):
            Rectangle(SKETCH14_5_W, SKETCH14_5_H)
        with Locations((88.885574448, 14.079649837)):
            Rectangle(SKETCH14_5_W_2, SKETCH14_5_H_2)
        with Locations((75.585574448, 44.029649837)):
            Rectangle(SKETCH14_5_W_3, SKETCH14_5_H_3)
    extrude(amount=BOSS_EXTRUDE8_DEPTH)

    # Sketch14<4> → Cut-Extrude13 (cut, two sides: drawn at the far end of the back side and taken through both)
    with BuildSketch(Plane(origin=(0, 0, 0), x_dir=(0.2249510543438689, 0, 0.9743700647852344), z_dir=(0, 1, 0)).offset(-CUT_EXTRUDE13_DEPTH_BACK)):
        with Locations(Location((75.585574448, 44.029649837, 0), (0, 0, 347))):
            Circle(SKETCH14_4_R)
        with Locations(Location((89.485574448, 14.079649837, 0), (0, 0, 347))):
            Circle(SKETCH14_4_R)
        with Locations(Location((57.235574448, 11.629649837, 0), (0, 0, 347))):
            Circle(SKETCH14_4_R)
    extrude(amount=CUT_EXTRUDE13_DEPTH + CUT_EXTRUDE13_DEPTH_BACK, mode=Mode.SUBTRACT)

    # Fillet1
    # the kernel refuses this fillet: 5 mm, written as the material it adds along each edge
    with BuildSketch(Plane(origin=(39.384495633, -4, 89.776968518), x_dir=(0.9743700647852339, 0, -0.22495105434387005), z_dir=(0, 1, 0))) as fillet1_piece_1_section:
        with BuildLine():
            CenterArc((FILLET1_R, FILLET1_R), FILLET1_R, 180, 90)
            Line((0, FILLET1_R), (0, 0))
            Line((0, 0), (FILLET1_R, 0))
        make_face()
    fillet1_piece_1 = extrude(amount=10, mode=Mode.PRIVATE)
    fillet1_piece_1 = split(fillet1_piece_1, bisect_by=Plane(origin=(39.850611244, 1, 86.43649931), z_dir=(0.2249510543438689, 0, 0.9743700647852344)), keep=Keep.TOP, mode=Mode.PRIVATE)
    add(fillet1_piece_1)
    with BuildSketch(Plane(origin=(39.384495633, -4, 89.776968518), x_dir=(0.9743700647852339, 0, -0.22495105434387005), z_dir=(0, 1, 0))) as fillet1_piece_2_section:
        with BuildLine():
            CenterArc((FILLET1_R, FILLET1_R), FILLET1_R, 180, 90)
            Line((0, FILLET1_R), (0, 0))
            Line((0, 0), (FILLET1_R, 0))
        make_face()
    fillet1_piece_2 = extrude(amount=10, mode=Mode.PRIVATE)
    fillet1_piece_2 = split(fillet1_piece_2, bisect_by=Plane(origin=(38.708870638, 1, 86.700090898), z_dir=(-0.2249510543438689, 0, -0.9743700647852344)), keep=Keep.TOP, mode=Mode.PRIVATE)
    add(fillet1_piece_2)
    with BuildSketch(Plane(origin=(39.384495633, -4, 89.776968518), x_dir=(0.9743700647852339, 0, -0.22495105434387005), z_dir=(0, 1, 0))) as fillet1_piece_3_section:
        with BuildLine():
            CenterArc((FILLET1_R, FILLET1_R), FILLET1_R, 180, 90)
            Line((0, FILLET1_R), (0, 0))
            Line((0, 0), (FILLET1_R, 0))
        make_face()
    fillet1_piece_3 = extrude(amount=22.5, mode=Mode.PRIVATE)
    fillet1_piece_3 = split(fillet1_piece_3, bisect_by=Plane(origin=(38.557191357, 6, 86.043095751), z_dir=(0, 1, 0)), keep=Keep.TOP, mode=Mode.PRIVATE)
    fillet1_piece_3 = split(fillet1_piece_3, bisect_by=Plane(origin=(38.708870638, 7.45, 86.700090898), z_dir=(-0.2249510543438689, 0, -0.9743700647852344)), keep=Keep.TOP, mode=Mode.PRIVATE)
    fillet1_piece_3 = split(fillet1_piece_3, bisect_by=Plane(origin=(38.557191357, 8.9, 86.043095751), z_dir=(0, -1, 0)), keep=Keep.TOP, mode=Mode.PRIVATE)
    add(fillet1_piece_3)

    # Sketch17 → Cut-Extrude16 (cut)
    # profile 1 of 2: a face of its own
    with BuildSketch(Plane(origin=(15.147208467, 0, 65.609768037), x_dir=(0.9743700647852345, 0, -0.2249510543438689), z_dir=(-0.2249510543438689, 0, -0.9743700647852345)).offset(CUT_EXTRUDE16_START)):
        with Locations((-9.370350163, 0)):
            Circle(SKETCH17_R)
        with Locations((-9.370350163, 0)):
            Circle(SKETCH17_R_2, mode=Mode.SUBTRACT)
    # profile 2 of 2: a face of its own
    with BuildSketch(Plane(origin=(15.147208467, 0, 65.609768037), x_dir=(0.9743700647852345, 0, -0.2249510543438689), z_dir=(-0.2249510543438689, 0, -0.9743700647852345)).offset(CUT_EXTRUDE16_START)):
        with Locations((-9.370350163, 0)):
            Circle(SKETCH17_R_2)
    extrude(amount=CUT_EXTRUDE16_DEPTH, mode=Mode.SUBTRACT)

    # Cut-Extrude17 outline → Cut-Extrude17 (cut)
    with BuildSketch(Plane(origin=(0, 0, 0), x_dir=(0.2249510543438689, 0, 0.9743700647852344), z_dir=(0, 1, 0))):
        Polygon((89.835574448, 4.129649837), (81.835574448, 4.129649837), (81.835574448, 1.129649837), (79.835574448, 1.129649837), (79.835574448, -16.870350163), (89.835574448, -16.870350163), align=None)
    extrude(amount=CUT_EXTRUDE17_DEPTH, mode=Mode.SUBTRACT)

    # Sketch18<3> → Cut-Extrude18 (cut, through all)
    with BuildSketch(Plane(origin=(0, 0, 0), x_dir=(0.2249510543438689, 0, 0.9743700647852344), z_dir=(0, 1, 0))):
        Polygon((81.835574448, 1.129649837), (81.835574448, -16.870350163), (89.835574448, -16.870350163), (89.835574448, 4.129649837), (81.835574448, 4.129649837), align=None)
    extrude(amount=-CUT_EXTRUDE18_DEPTH, mode=Mode.SUBTRACT)

    # Sketch18<4> → Cut-Extrude19 (cut)
    with BuildSketch(Plane(origin=(0, 0, 0), x_dir=(0.2249510543438689, 0, 0.9743700647852344), z_dir=(0, 1, 0)).offset(CUT_EXTRUDE19_START)):
        with Locations((67.085574448, -8.870350163)):
            Rectangle(SKETCH18_4_W, SKETCH18_4_H)
    extrude(amount=CUT_EXTRUDE19_DEPTH, mode=Mode.SUBTRACT)

    # Sketch21 → Cut-Extrude21 (cut)
    with BuildSketch(Plane(origin=(0, 0, 0), x_dir=(0.2249510543438689, 0, 0.9743700647852344), z_dir=(0, 1, 0)).offset(CUT_EXTRUDE21_START)):
        with Locations(Location((51.335574448, -17.870350163, 0), (0, 0, 167))):
            Circle(SKETCH21_R)
        with Locations(Location((55.835574448, 4.129649837, 0), (0, 0, 167))):
            Circle(SKETCH21_R)
        with Locations(Location((78.835574448, 4.129649837, 0), (0, 0, 167))):
            Circle(SKETCH21_R)
        with Locations(Location((82.335574448, -18.870350163, 0), (0, 0, 167))):
            Circle(SKETCH21_R)
    extrude(amount=-CUT_EXTRUDE21_DEPTH, mode=Mode.SUBTRACT)

    # Sketch22 → Cut-Extrude22 (cut, two sides: drawn at the far end of the back side and taken through both)
    with BuildSketch(Plane(origin=(0, 0, 0), x_dir=(0, 0, -1), z_dir=(1, 0, 0)).offset(-CUT_EXTRUDE22_DEPTH_BACK)):
        with BuildLine():
            ThreePointArc((8, -6), (3.757359313, -4.242640687), (2, 0))
            Line((2, 0), (-5.52362234, -13.031296149))
            Line((-5.52362234, -13.031296149), (8, -13.031296149))
            Line((8, -13.031296149), (8, -6))
        make_face()
    extrude(amount=CUT_EXTRUDE22_DEPTH + CUT_EXTRUDE22_DEPTH_BACK, mode=Mode.SUBTRACT)


solid = part.part
